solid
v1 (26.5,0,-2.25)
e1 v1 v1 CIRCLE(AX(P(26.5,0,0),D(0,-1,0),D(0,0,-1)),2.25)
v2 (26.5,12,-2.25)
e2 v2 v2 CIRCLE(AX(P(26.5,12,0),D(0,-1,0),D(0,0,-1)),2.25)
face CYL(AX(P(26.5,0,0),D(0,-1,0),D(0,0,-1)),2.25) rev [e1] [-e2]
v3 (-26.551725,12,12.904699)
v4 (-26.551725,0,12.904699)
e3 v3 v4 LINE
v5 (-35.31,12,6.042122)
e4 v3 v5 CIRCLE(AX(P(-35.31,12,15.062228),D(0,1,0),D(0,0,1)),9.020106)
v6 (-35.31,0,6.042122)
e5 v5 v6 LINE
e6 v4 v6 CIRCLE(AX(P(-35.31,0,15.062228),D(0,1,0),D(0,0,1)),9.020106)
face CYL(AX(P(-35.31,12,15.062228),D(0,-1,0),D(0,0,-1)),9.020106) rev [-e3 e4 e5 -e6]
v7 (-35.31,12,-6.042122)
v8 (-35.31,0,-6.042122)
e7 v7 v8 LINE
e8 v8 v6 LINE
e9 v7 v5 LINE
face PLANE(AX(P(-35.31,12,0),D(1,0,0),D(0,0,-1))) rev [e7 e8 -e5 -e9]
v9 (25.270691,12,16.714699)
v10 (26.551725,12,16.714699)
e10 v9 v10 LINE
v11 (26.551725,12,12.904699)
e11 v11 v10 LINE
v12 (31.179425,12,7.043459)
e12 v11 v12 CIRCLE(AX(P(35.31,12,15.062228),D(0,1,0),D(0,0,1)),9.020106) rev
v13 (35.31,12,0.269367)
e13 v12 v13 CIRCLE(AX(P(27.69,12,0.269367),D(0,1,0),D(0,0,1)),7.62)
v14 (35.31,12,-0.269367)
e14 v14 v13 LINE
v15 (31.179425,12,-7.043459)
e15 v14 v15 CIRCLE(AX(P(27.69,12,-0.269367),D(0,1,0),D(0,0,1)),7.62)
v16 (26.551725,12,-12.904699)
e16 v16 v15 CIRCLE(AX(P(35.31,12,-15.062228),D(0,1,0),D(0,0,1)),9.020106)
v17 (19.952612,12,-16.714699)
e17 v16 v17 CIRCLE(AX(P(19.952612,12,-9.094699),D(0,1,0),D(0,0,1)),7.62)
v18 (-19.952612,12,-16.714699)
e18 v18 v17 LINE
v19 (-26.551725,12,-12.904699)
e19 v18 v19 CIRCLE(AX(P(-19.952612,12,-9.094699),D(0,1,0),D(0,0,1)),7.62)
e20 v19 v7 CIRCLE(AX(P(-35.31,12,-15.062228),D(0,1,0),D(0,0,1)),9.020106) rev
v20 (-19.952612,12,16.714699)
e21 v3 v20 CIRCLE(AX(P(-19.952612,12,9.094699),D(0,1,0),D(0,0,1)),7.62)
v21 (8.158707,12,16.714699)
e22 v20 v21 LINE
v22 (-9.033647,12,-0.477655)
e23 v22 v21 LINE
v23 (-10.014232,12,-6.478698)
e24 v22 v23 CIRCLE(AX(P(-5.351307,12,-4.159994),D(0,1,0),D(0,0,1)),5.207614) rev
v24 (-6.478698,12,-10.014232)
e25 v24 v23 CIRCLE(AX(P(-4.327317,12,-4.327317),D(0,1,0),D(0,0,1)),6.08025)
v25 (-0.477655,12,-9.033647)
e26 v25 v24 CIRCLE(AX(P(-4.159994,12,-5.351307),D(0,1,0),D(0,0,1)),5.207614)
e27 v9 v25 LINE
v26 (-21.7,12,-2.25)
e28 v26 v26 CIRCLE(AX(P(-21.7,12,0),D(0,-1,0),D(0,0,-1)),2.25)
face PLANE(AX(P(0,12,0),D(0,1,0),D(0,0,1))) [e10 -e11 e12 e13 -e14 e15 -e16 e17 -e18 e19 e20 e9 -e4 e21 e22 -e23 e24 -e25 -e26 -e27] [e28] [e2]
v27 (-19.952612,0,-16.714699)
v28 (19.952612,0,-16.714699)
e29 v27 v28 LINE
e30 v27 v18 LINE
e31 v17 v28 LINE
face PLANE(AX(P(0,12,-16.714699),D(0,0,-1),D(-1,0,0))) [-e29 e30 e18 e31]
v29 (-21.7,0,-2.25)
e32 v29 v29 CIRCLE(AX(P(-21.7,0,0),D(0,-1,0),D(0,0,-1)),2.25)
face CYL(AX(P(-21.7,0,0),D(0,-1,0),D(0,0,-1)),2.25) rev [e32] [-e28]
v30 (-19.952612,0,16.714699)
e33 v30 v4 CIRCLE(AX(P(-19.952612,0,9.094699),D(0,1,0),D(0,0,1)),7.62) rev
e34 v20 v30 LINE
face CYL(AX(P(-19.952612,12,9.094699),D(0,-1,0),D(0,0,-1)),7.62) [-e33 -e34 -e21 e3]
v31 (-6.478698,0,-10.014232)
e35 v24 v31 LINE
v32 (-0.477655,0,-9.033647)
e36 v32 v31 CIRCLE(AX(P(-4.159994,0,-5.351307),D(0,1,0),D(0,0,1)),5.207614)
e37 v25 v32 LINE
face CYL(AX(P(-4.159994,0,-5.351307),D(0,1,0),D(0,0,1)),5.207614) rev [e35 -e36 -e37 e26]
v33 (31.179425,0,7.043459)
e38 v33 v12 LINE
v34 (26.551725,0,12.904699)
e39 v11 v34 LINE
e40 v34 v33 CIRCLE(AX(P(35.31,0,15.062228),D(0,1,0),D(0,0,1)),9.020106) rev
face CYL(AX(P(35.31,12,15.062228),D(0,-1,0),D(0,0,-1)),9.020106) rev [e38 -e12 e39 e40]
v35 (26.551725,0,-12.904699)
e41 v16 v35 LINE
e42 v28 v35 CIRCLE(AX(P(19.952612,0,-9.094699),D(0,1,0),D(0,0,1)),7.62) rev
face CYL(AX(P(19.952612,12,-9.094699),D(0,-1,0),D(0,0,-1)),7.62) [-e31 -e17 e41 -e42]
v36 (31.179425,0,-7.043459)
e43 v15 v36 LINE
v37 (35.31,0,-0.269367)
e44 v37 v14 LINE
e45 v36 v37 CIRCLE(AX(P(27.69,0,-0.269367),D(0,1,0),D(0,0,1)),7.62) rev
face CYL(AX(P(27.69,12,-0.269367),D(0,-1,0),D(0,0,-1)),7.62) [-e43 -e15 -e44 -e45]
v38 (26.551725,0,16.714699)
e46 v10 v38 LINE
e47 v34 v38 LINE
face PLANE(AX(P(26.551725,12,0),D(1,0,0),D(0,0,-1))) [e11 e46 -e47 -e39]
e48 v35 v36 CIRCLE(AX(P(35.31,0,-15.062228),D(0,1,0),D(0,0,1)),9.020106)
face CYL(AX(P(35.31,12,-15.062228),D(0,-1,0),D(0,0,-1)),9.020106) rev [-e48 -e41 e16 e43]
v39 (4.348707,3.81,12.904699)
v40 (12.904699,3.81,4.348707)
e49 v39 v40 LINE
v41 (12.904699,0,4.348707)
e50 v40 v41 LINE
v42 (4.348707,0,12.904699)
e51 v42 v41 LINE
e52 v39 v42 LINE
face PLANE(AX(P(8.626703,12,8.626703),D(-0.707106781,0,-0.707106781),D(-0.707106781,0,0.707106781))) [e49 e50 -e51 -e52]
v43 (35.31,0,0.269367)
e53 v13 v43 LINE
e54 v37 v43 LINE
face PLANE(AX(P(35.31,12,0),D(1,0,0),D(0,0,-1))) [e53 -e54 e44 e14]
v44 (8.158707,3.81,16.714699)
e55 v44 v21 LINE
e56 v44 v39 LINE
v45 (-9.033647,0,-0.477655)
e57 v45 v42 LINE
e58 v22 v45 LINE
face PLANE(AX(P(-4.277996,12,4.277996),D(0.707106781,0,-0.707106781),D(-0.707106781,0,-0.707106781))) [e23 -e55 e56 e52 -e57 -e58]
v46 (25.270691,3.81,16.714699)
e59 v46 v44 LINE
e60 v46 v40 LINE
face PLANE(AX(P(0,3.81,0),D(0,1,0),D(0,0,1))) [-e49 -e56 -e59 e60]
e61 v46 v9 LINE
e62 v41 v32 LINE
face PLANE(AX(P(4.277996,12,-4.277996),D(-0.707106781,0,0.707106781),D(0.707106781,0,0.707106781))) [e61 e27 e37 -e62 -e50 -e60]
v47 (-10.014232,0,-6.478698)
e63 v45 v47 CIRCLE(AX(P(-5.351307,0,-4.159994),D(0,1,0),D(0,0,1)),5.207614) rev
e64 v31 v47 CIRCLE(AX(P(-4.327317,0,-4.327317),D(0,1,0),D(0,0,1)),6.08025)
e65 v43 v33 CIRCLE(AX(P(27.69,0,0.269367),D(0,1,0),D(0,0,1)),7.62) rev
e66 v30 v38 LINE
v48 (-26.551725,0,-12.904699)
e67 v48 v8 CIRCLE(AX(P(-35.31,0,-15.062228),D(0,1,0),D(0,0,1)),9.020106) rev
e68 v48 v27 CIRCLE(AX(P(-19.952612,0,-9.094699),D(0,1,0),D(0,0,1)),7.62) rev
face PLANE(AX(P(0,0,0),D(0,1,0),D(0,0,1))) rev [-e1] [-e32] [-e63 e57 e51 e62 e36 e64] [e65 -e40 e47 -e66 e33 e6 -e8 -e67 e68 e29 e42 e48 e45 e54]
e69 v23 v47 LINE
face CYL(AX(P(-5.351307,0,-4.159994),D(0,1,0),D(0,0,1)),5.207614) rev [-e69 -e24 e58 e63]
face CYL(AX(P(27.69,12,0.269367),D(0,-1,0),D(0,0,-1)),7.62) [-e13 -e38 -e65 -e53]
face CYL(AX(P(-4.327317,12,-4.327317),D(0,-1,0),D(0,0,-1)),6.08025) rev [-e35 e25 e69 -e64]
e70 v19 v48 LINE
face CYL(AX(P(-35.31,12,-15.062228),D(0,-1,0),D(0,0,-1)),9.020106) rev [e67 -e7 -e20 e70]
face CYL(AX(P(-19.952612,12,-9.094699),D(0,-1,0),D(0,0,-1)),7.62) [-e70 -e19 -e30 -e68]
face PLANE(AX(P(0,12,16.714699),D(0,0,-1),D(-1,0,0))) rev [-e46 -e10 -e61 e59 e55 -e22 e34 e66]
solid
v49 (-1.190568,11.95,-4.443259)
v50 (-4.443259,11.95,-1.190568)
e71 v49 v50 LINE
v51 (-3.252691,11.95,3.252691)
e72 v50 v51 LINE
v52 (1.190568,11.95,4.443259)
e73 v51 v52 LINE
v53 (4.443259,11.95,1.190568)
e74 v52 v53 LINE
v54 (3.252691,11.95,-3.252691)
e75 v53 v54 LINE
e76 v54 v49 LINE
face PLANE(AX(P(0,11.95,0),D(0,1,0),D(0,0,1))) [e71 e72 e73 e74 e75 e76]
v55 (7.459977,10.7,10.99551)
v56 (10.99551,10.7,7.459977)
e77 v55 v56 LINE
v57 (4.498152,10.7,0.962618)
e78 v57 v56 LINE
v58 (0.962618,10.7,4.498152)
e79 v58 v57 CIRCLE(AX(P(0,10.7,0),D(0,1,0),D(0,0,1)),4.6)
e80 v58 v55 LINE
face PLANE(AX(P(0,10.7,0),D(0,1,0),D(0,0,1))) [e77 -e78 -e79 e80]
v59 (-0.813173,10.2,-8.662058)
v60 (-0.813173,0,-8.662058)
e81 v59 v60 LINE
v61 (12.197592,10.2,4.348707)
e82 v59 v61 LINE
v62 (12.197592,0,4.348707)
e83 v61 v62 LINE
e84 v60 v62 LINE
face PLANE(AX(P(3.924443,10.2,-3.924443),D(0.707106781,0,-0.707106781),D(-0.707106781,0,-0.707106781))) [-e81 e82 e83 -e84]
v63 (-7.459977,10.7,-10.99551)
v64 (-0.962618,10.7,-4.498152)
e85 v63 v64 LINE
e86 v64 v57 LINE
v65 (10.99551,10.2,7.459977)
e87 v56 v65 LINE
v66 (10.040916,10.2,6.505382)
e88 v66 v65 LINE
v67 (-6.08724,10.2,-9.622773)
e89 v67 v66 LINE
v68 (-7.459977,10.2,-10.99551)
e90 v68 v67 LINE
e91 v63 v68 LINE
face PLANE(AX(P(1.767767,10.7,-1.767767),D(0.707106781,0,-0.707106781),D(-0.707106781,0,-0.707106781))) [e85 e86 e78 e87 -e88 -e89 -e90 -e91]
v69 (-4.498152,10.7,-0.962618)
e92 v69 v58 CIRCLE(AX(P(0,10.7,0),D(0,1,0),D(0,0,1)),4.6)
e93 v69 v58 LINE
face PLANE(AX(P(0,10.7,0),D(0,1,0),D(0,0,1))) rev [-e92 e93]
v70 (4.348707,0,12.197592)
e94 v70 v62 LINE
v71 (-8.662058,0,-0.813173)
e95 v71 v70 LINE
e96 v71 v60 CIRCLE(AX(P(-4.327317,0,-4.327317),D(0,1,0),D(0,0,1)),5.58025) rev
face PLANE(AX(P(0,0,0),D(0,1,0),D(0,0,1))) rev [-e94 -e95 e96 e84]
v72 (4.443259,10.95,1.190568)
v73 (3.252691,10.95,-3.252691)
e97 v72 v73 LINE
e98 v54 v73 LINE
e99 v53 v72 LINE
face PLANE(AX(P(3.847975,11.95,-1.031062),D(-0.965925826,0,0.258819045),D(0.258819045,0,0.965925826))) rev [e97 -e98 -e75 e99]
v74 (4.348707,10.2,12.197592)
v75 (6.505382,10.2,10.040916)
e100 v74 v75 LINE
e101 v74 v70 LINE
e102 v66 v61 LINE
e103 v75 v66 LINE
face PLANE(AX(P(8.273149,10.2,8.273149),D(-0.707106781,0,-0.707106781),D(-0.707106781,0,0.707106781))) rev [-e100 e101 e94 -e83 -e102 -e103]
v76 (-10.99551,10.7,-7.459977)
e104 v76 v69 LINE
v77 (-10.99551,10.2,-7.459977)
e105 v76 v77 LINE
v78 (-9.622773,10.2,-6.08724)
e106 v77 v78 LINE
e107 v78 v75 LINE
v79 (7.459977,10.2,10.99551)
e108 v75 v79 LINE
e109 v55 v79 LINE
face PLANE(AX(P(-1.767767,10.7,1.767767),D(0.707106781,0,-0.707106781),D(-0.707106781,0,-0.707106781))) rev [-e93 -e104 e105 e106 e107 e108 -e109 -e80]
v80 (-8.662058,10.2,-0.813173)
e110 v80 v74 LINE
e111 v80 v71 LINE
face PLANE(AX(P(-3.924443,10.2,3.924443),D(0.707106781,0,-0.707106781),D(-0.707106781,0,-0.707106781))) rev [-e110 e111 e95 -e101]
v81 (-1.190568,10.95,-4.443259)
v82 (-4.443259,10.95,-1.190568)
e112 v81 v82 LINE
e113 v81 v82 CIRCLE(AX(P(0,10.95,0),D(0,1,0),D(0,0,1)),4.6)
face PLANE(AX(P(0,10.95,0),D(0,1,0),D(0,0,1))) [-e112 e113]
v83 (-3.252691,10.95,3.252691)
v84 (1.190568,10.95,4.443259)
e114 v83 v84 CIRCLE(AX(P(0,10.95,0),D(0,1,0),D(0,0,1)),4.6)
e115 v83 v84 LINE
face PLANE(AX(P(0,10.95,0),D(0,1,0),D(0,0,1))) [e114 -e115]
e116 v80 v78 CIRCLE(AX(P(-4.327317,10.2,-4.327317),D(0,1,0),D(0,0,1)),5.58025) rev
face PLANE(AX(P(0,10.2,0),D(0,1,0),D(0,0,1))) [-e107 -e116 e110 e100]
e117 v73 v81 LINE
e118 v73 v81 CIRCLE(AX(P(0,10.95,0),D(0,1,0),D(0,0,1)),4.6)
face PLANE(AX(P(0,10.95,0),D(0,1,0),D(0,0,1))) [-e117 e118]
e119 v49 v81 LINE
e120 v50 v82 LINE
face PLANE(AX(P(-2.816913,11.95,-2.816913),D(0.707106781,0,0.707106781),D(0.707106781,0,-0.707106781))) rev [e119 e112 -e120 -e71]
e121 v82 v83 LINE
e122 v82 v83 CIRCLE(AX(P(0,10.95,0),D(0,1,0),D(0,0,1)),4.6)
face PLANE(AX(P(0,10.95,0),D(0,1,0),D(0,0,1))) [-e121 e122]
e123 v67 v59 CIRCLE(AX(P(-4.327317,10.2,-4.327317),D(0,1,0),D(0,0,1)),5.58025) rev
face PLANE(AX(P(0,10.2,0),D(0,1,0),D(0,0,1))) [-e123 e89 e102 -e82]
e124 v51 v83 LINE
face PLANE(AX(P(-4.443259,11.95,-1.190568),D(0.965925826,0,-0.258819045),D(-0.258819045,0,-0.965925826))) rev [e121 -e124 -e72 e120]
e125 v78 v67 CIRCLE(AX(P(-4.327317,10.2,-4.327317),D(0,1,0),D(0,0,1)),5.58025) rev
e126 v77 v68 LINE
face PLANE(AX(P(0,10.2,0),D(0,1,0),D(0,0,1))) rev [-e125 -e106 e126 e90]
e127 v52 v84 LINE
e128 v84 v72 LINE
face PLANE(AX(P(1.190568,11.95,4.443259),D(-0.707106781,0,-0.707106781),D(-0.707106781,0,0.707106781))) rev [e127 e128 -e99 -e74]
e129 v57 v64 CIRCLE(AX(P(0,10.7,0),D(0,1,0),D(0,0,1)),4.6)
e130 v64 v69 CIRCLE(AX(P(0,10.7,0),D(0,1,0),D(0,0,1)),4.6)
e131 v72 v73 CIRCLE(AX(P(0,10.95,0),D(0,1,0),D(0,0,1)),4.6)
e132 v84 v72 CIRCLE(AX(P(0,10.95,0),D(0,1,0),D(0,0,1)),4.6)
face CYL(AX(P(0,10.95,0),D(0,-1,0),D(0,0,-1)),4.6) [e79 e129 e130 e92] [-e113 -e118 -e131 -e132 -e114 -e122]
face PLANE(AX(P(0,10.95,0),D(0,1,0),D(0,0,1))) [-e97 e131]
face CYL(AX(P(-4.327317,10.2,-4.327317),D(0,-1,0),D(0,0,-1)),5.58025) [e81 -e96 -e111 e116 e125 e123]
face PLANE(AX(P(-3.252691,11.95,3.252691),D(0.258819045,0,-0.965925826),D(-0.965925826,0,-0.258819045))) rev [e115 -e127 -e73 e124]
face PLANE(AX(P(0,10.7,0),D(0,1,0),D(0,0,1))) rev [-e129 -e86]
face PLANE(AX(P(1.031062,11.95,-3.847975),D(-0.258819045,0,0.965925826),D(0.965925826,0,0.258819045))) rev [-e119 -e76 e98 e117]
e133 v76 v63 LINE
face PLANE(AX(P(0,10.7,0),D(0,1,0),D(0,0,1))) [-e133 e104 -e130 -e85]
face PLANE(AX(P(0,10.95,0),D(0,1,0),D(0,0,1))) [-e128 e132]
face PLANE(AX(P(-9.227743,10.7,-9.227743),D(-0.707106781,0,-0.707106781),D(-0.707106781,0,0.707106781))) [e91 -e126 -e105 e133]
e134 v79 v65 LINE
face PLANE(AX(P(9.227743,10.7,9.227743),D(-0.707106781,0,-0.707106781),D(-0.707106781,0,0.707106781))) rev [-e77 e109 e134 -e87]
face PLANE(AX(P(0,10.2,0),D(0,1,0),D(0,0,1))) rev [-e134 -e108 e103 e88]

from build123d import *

# Parameters (mm, degrees)
BOSS_EXTRUDE1_DEPTH           = 10.2
BOSS_EXTRUDE2_DEPTH           = 0.5
BOSS_EXTRUDE4_DEPTH           = 0.25
BOSS_EXTRUDE5_DEPTH           = 1.25
BOSS_EXTRUDE6_DEPTH           = 12
CUT_EXTRUDE1_DEPTH            = 41.867802174
CUT_EXTRUDE2_DEPTH            = 8.19
SKETCH10_W                    = 2.25
SKETCH10_H                    = 12
M4_CLEARANCE_HOLE1_AT_2_COUNT = 2
M4_CLEARANCE_HOLE1_AT_2_PITCH = 48.2
FILLET1_R                     = 7.62
FILLET2_R                     = 7.62


with BuildPart() as part:
    # Sketch1 → Boss-Extrude1 (new body)
    with BuildSketch(Plane(origin=(0, 0, 0), x_dir=(1, 0, 0), z_dir=(0, 1, 0))):
        with BuildLine():
            ThreePointArc((-8.273149364, 8.273149316), (-9.899999094, 4.617835693), (-8.66205807, 0.813172798))
            Line((-8.66205807, 0.813172798), (4.348706704, -12.197591975))
            Line((4.348706704, -12.197591975), (12.197591975, -4.348706704))
            Line((12.197591975, -4.348706704), (-0.813172798, 8.66205807))
            ThreePointArc((-0.813172798, 8.66205807), (-4.617835727, 9.899999092), (-8.273149364, 8.273149316))
        make_face()
    extrude(amount=BOSS_EXTRUDE1_DEPTH)

    # Sketch2 → Boss-Extrude2 (add)
    with BuildSketch(Plane(origin=(0, 10.2, 0), x_dir=(1, 0, 0), z_dir=(0, 1, 0))):
        Polygon((-10.995510447, 7.459976542), (7.459976542, -10.995510447), (10.995510447, -7.459976542), (-7.459976542, 10.995510447), align=None)
    extrude(amount=BOSS_EXTRUDE2_DEPTH)



with BuildPart() as body_2:
    # Sketch3 → Boss-Extrude4 (new body)
    with BuildSketch(Plane(origin=(0, 10.7, 0), x_dir=(1, 0, 0), z_dir=(0, 1, 0))):
        with BuildLine():
            Line((2.816913201, -2.816913207), (1.190567607, -4.443258801))
            ThreePointArc((1.190567607, -4.443258801), (3.252691193, -3.252691193), (4.443258801, -1.190567607))
            Line((4.443258801, -1.190567607), (2.816913201, -2.816913207))
        make_face()
        with BuildLine():
            ThreePointArc((-3.252691193, -3.252691193), (-1.303419386, -4.411473439), (0.962617635, -4.498151541))
            Line((0.962617635, -4.498151541), (0.804197277, -4.339731183))
            Line((0.804197277, -4.339731183), (-1.031061719, -3.847975017))
            Line((-1.031061719, -3.847975017), (-3.252691193, -3.252691193))
        make_face()
        with BuildLine():
            Line((0.804197277, -4.339731183), (0.962617635, -4.498151541))
            ThreePointArc((0.962617635, -4.498151541), (1.07694242, -4.472157759), (1.190567607, -4.443258801))
            Line((1.190567607, -4.443258801), (0.804197277, -4.339731183))
        make_face()
        with BuildLine():
            ThreePointArc((-4.443258801, 1.190567607), (-4.472157759, 1.07694242), (-4.498151541, 0.962617635))
            Line((-4.498151541, 0.962617635), (-4.339731183, 0.804197277))
            Line((-4.339731183, 0.804197277), (-4.443258801, 1.190567607))
        make_face()
        with BuildLine():
            Line((-4.339731183, 0.804197277), (-4.498151541, 0.962617635))
            ThreePointArc((-4.498151541, 0.962617635), (-4.411473439, -1.303419386), (-3.252691193, -3.252691193))
            Line((-3.252691193, -3.252691193), (-3.847975039, -1.031061638))
            Line((-3.847975039, -1.031061638), (-4.339731183, 0.804197277))
        make_face()
        with BuildLine():
            ThreePointArc((-1.190567607, 4.443258801), (-3.252691193, 3.252691193), (-4.443258801, 1.190567607))
            Line((-4.443258801, 1.190567607), (-2.816913206, 2.816913202))
            Line((-2.816913206, 2.816913202), (-1.190567607, 4.443258801))
        make_face()
        with BuildLine():
            ThreePointArc((3.252691193, 3.252691193), (1.303419386, 4.411473439), (-0.962617635, 4.498151541))
            Line((-0.962617635, 4.498151541), (-0.804197277, 4.339731183))
            Line((-0.804197277, 4.339731183), (1.03106158, 3.847975054))
            Line((1.03106158, 3.847975054), (3.252691193, 3.252691193))
        make_face()
        with BuildLine():
            Line((-0.804197277, 4.339731183), (-0.962617635, 4.498151541))
            ThreePointArc((-0.962617635, 4.498151541), (-1.07694242, 4.472157759), (-1.190567607, 4.443258801))
            Line((-1.190567607, 4.443258801), (-0.804197277, 4.339731183))
        make_face()
        with BuildLine():
            ThreePointArc((4.443258801, -1.190567607), (4.472157759, -1.07694242), (4.498151541, -0.962617635))
            Line((4.498151541, -0.962617635), (4.339731183, -0.804197277))
            Line((4.339731183, -0.804197277), (4.443258801, -1.190567607))
        make_face()
        with BuildLine():
            Line((4.339731183, -0.804197277), (4.498151541, -0.962617635))
            ThreePointArc((4.498151541, -0.962617635), (4.574467023, -0.483995305), (4.6, 0))
            ThreePointArc((4.6, 0), (4.24984585, 1.760343789), (3.252691193, 3.252691193))
            Line((3.252691193, 3.252691193), (3.847975061, 1.031061553))
            Line((3.847975061, 1.031061553), (4.339731183, -0.804197277))
        make_face()
        with BuildLine():
            ThreePointArc((-3.252691193, -3.252691193), (-1.303419386, -4.411473439), (0.962617635, -4.498151541))
            Line((0.962617635, -4.498151541), (0.804197277, -4.339731183))
            Line((0.804197277, -4.339731183), (-1.031061719, -3.847975017))
            Line((-1.031061719, -3.847975017), (-3.252691193, -3.252691193))
        make_face()
        with BuildLine():
            Line((0.804197277, -4.339731183), (0.962617635, -4.498151541))
            ThreePointArc((0.962617635, -4.498151541), (1.07694242, -4.472157759), (1.190567607, -4.443258801))
            Line((1.190567607, -4.443258801), (0.804197277, -4.339731183))
        make_face()
        with BuildLine():
            ThreePointArc((-4.443258801, 1.190567607), (-4.472157759, 1.07694242), (-4.498151541, 0.962617635))
            Line((-4.498151541, 0.962617635), (-4.339731183, 0.804197277))
            Line((-4.339731183, 0.804197277), (-4.443258801, 1.190567607))
        make_face()
        with BuildLine():
            Line((-4.339731183, 0.804197277), (-4.498151541, 0.962617635))
            ThreePointArc((-4.498151541, 0.962617635), (-4.411473439, -1.303419386), (-3.252691193, -3.252691193))
            Line((-3.252691193, -3.252691193), (-3.847975039, -1.031061638))
            Line((-3.847975039, -1.031061638), (-4.339731183, 0.804197277))
        make_face()
        with BuildLine():
            ThreePointArc((3.252691193, 3.252691193), (1.303419386, 4.411473439), (-0.962617635, 4.498151541))
            Line((-0.962617635, 4.498151541), (-0.804197277, 4.339731183))
            Line((-0.804197277, 4.339731183), (1.03106158, 3.847975054))
            Line((1.03106158, 3.847975054), (3.252691193, 3.252691193))
        make_face()
        with BuildLine():
            Line((-0.804197277, 4.339731183), (-0.962617635, 4.498151541))
            ThreePointArc((-0.962617635, 4.498151541), (-1.07694242, 4.472157759), (-1.190567607, 4.443258801))
            Line((-1.190567607, 4.443258801), (-0.804197277, 4.339731183))
        make_face()
        with BuildLine():
            ThreePointArc((4.443258801, -1.190567607), (4.472157759, -1.07694242), (4.498151541, -0.962617635))
            Line((4.498151541, -0.962617635), (4.339731183, -0.804197277))
            Line((4.339731183, -0.804197277), (4.443258801, -1.190567607))
        make_face()
        with BuildLine():
            Line((4.339731183, -0.804197277), (4.498151541, -0.962617635))
            ThreePointArc((4.498151541, -0.962617635), (4.574467023, -0.483995305), (4.6, 0))
            ThreePointArc((4.6, 0), (4.24984585, 1.760343789), (3.252691193, 3.252691193))
            Line((3.252691193, 3.252691193), (3.847975061, 1.031061553))
            Line((3.847975061, 1.031061553), (4.339731183, -0.804197277))
        make_face()
    extrude(amount=BOSS_EXTRUDE4_DEPTH)


with BuildPart() as part_1:
    add(part.part)

    add(body_2.part)  # Boss-Extrude5 merges body 2
    # Sketch3<3> → Boss-Extrude5 (add)
    with BuildSketch(Plane(origin=(0, 10.7, 0), x_dir=(1, 0, 0), z_dir=(0, 1, 0))):
        Polygon((4.443258801, -1.190567607), (3.252691193, 3.252691193), (-1.190567607, 4.443258801), (-4.443258801, 1.190567607), (-3.252691193, -3.252691193), (1.190567607, -4.443258801), align=None)
    extrude(amount=BOSS_EXTRUDE5_DEPTH)


with BuildPart() as body_2_2:
    # Sketch5 → Boss-Extrude6 (new body)
    with BuildSketch(Plane(origin=(0, 0, 0), x_dir=(1, 0, 0), z_dir=(0, 1, 0))):
        with BuildLine():
            Line((26.551725125, -16.714698757), (26.551725125, -12.904698757))
            ThreePointArc((26.551725125, -12.904698757), (29.746675052, -7.962106389), (35.31, -6.042122046))
            Line((35.31, -6.042122046), (35.31, 6.042122046))
            ThreePointArc((35.31, 6.042122046), (29.746675052, 7.962106389), (26.551725125, 12.904698757))
            Line((26.551725125, 12.904698757), (26.551725125, 16.714698757))
            Line((26.551725125, 16.714698757), (-26.551725125, 16.714698757))
            Line((-26.551725125, 16.714698757), (-26.551725125, 12.904698757))
            ThreePointArc((-26.551725125, 12.904698757), (-29.746675052, 7.962106389), (-35.31, 6.042122046))
            Line((-35.31, 6.042122046), (-35.31, -6.042122046))
            ThreePointArc((-35.31, -6.042122046), (-29.746675052, -7.962106389), (-26.551725125, -12.904698757))
            Line((-26.551725125, -12.904698757), (-26.551725125, -16.714698757))
            Line((-26.551725125, -16.714698757), (26.551725125, -16.714698757))
        make_face()
        with BuildLine():
            Line((-9.033646769, 0.477654716), (-8.66205807, 0.813172798))
            ThreePointArc((-8.66205807, 0.813172798), (-9.8172278, 3.327283506), (-9.622773435, 6.08723953))
            Line((-9.622773435, 6.08723953), (-10.014231548, 6.478697642))
            ThreePointArc((-10.014231548, 6.478697642), (-8.62670273, 8.62670273), (-6.478697642, 10.014231548))
            Line((-6.478697642, 10.014231548), (-6.08723953, 9.622773435))
            ThreePointArc((-6.08723953, 9.622773435), (-3.327283506, 9.8172278), (-0.813172798, 8.66205807))
            Line((-0.813172798, 8.66205807), (-0.477654716, 9.033646769))
            Line((-0.477654716, 9.033646769), (12.904698757, -4.348706704))
            Line((12.904698757, -4.348706704), (4.348706704, -12.904698757))
            Line((4.348706704, -12.904698757), (-9.033646769, 0.477654716))
        make_face(mode=Mode.SUBTRACT)
    extrude(amount=BOSS_EXTRUDE6_DEPTH)

    # Sketch6 → Cut-Extrude1 (cut, through all)
    with BuildSketch(Plane(origin=(0, 12, 0), x_dir=(1, 0, 0), z_dir=(0, 1, 0))):
        with BuildLine():
            ThreePointArc((-9.033646769, 0.477654716), (-10.490761124, 3.320195156), (-10.014231548, 6.478697642))
            Line((-10.014231548, 6.478697642), (-9.622773435, 6.08723953))
            ThreePointArc((-9.622773435, 6.08723953), (-9.8172278, 3.327283506), (-8.66205807, 0.813172798))
            Line((-8.66205807, 0.813172798), (-9.033646769, 0.477654716))
        make_face()
        with BuildLine():
            ThreePointArc((-0.477654716, 9.033646769), (-3.320195156, 10.490761124), (-6.478697642, 10.014231548))
            Line((-6.478697642, 10.014231548), (-6.08723953, 9.622773435))
            ThreePointArc((-6.08723953, 9.622773435), (-3.327283506, 9.8172278), (-0.813172798, 8.66205807))
            Line((-0.813172798, 8.66205807), (-0.477654716, 9.033646769))
        make_face()
    extrude(amount=-CUT_EXTRUDE1_DEPTH, mode=Mode.SUBTRACT)

    # Sketch8 → Cut-Extrude2 (cut)
    with BuildSketch(Plane(origin=(0, 12, 0), x_dir=(1, 0, 0), z_dir=(0, 1, 0))):
        Polygon((12.904698757, -4.348706704), (4.348706704, -12.904698757), (8.158706704, -16.714698757), (25.270690809, -16.714698757), align=None)
    extrude(amount=-CUT_EXTRUDE2_DEPTH, mode=Mode.SUBTRACT)

    # Sketch10 → M4 Clearance Hole1 (revolve, cut)
    with BuildSketch(Plane(origin=(26.5, 0, 0), x_dir=(0, 0, -1), z_dir=(1, 0, 0))):
        with Locations((1.125, 6)):
            Rectangle(SKETCH10_W, SKETCH10_H)
    m4_clearance_hole1 = revolve(axis=Axis((26.5, -6.35, 0), (0, 1, 0)), mode=Mode.SUBTRACT)

    # M4 Clearance Hole1 at 2: M4 Clearance Hole1 ×2
    with Locations(*[(-i * M4_CLEARANCE_HOLE1_AT_2_PITCH, 0, 0) for i in range(1, M4_CLEARANCE_HOLE1_AT_2_COUNT)]):
        add(m4_clearance_hole1, mode=Mode.SUBTRACT)

    # Fillet1
    fillet1_edges = [body_2_2.edges().sort_by_distance(p)[0] for p in [
        (35.31, 6, -6.042122046),
        (35.31, 6, 6.042122046),
    ]]
    fillet(fillet1_edges, radius=FILLET1_R)

    # Fillet2
    # the kernel refuses this fillet: 7.62 mm, written as the material it takes off along each edge
    with BuildSketch(Plane(origin=(-26.551725125, -16.497783942, 16.714698757), x_dir=(1, 0, 0), z_dir=(0, 1, 0))) as fillet2_piece_1:
        with BuildLine():
            CenterArc((6.599113577, 7.62), FILLET2_R, 210, 60)
            Line((0, 3.81), (-0.131982272, 3.7338))
            ThreePointArc((-0.131982272, 3.7338), (-0.1524, 1.905), (-0.1524, 0))
            Line((-0.1524, 0), (0, -0.1524))
            Line((0, -0.1524), (6.599113577, -0.1524))
            Line((6.599113577, -0.1524), (6.599113577, 0))
        make_face()
    extrude(amount=44.995567884, mode=Mode.SUBTRACT)
    with BuildSketch(Plane(origin=(-26.551725125, -16.497783942, -16.714698757), x_dir=(1, 0, 0), z_dir=(0, 1, 0))) as fillet2_piece_2:
        with BuildLine():
            CenterArc((6.599113577, -7.62), FILLET2_R, 90, 60)
            Line((0, -3.81), (-0.131982272, -3.7338))
            ThreePointArc((-0.131982272, -3.7338), (-0.1524, -1.905), (-0.1524, 0))
            Line((-0.1524, 0), (0, 0.1524))
            Line((0, 0.1524), (6.599113577, 0.1524))
            Line((6.599113577, 0.1524), (6.599113577, 0))
        make_face()
    extrude(amount=44.995567884, mode=Mode.SUBTRACT)
    with BuildSketch(Plane(origin=(26.551725125, -16.497783942, -16.714698757), x_dir=(0, 0, 1), z_dir=(0, 1, 0))) as fillet2_piece_3:
        with BuildLine():
            CenterArc((7.62, -6.599113577), FILLET2_R, 120, 60)
            Line((0, -6.599113577), (-0.1524, -6.599113577))
            Line((-0.1524, -6.599113577), (-0.1524, 0))
            Line((-0.1524, 0), (0, 0.1524))
            ThreePointArc((0, 0.1524), (1.905, 0.1524), (3.7338, 0.131982272))
            Line((3.7338, 0.131982272), (3.81, 0))
        make_face()
    extrude(amount=44.995567884, mode=Mode.SUBTRACT)


solid = Compound([part_1.part, body_2_2.part])
